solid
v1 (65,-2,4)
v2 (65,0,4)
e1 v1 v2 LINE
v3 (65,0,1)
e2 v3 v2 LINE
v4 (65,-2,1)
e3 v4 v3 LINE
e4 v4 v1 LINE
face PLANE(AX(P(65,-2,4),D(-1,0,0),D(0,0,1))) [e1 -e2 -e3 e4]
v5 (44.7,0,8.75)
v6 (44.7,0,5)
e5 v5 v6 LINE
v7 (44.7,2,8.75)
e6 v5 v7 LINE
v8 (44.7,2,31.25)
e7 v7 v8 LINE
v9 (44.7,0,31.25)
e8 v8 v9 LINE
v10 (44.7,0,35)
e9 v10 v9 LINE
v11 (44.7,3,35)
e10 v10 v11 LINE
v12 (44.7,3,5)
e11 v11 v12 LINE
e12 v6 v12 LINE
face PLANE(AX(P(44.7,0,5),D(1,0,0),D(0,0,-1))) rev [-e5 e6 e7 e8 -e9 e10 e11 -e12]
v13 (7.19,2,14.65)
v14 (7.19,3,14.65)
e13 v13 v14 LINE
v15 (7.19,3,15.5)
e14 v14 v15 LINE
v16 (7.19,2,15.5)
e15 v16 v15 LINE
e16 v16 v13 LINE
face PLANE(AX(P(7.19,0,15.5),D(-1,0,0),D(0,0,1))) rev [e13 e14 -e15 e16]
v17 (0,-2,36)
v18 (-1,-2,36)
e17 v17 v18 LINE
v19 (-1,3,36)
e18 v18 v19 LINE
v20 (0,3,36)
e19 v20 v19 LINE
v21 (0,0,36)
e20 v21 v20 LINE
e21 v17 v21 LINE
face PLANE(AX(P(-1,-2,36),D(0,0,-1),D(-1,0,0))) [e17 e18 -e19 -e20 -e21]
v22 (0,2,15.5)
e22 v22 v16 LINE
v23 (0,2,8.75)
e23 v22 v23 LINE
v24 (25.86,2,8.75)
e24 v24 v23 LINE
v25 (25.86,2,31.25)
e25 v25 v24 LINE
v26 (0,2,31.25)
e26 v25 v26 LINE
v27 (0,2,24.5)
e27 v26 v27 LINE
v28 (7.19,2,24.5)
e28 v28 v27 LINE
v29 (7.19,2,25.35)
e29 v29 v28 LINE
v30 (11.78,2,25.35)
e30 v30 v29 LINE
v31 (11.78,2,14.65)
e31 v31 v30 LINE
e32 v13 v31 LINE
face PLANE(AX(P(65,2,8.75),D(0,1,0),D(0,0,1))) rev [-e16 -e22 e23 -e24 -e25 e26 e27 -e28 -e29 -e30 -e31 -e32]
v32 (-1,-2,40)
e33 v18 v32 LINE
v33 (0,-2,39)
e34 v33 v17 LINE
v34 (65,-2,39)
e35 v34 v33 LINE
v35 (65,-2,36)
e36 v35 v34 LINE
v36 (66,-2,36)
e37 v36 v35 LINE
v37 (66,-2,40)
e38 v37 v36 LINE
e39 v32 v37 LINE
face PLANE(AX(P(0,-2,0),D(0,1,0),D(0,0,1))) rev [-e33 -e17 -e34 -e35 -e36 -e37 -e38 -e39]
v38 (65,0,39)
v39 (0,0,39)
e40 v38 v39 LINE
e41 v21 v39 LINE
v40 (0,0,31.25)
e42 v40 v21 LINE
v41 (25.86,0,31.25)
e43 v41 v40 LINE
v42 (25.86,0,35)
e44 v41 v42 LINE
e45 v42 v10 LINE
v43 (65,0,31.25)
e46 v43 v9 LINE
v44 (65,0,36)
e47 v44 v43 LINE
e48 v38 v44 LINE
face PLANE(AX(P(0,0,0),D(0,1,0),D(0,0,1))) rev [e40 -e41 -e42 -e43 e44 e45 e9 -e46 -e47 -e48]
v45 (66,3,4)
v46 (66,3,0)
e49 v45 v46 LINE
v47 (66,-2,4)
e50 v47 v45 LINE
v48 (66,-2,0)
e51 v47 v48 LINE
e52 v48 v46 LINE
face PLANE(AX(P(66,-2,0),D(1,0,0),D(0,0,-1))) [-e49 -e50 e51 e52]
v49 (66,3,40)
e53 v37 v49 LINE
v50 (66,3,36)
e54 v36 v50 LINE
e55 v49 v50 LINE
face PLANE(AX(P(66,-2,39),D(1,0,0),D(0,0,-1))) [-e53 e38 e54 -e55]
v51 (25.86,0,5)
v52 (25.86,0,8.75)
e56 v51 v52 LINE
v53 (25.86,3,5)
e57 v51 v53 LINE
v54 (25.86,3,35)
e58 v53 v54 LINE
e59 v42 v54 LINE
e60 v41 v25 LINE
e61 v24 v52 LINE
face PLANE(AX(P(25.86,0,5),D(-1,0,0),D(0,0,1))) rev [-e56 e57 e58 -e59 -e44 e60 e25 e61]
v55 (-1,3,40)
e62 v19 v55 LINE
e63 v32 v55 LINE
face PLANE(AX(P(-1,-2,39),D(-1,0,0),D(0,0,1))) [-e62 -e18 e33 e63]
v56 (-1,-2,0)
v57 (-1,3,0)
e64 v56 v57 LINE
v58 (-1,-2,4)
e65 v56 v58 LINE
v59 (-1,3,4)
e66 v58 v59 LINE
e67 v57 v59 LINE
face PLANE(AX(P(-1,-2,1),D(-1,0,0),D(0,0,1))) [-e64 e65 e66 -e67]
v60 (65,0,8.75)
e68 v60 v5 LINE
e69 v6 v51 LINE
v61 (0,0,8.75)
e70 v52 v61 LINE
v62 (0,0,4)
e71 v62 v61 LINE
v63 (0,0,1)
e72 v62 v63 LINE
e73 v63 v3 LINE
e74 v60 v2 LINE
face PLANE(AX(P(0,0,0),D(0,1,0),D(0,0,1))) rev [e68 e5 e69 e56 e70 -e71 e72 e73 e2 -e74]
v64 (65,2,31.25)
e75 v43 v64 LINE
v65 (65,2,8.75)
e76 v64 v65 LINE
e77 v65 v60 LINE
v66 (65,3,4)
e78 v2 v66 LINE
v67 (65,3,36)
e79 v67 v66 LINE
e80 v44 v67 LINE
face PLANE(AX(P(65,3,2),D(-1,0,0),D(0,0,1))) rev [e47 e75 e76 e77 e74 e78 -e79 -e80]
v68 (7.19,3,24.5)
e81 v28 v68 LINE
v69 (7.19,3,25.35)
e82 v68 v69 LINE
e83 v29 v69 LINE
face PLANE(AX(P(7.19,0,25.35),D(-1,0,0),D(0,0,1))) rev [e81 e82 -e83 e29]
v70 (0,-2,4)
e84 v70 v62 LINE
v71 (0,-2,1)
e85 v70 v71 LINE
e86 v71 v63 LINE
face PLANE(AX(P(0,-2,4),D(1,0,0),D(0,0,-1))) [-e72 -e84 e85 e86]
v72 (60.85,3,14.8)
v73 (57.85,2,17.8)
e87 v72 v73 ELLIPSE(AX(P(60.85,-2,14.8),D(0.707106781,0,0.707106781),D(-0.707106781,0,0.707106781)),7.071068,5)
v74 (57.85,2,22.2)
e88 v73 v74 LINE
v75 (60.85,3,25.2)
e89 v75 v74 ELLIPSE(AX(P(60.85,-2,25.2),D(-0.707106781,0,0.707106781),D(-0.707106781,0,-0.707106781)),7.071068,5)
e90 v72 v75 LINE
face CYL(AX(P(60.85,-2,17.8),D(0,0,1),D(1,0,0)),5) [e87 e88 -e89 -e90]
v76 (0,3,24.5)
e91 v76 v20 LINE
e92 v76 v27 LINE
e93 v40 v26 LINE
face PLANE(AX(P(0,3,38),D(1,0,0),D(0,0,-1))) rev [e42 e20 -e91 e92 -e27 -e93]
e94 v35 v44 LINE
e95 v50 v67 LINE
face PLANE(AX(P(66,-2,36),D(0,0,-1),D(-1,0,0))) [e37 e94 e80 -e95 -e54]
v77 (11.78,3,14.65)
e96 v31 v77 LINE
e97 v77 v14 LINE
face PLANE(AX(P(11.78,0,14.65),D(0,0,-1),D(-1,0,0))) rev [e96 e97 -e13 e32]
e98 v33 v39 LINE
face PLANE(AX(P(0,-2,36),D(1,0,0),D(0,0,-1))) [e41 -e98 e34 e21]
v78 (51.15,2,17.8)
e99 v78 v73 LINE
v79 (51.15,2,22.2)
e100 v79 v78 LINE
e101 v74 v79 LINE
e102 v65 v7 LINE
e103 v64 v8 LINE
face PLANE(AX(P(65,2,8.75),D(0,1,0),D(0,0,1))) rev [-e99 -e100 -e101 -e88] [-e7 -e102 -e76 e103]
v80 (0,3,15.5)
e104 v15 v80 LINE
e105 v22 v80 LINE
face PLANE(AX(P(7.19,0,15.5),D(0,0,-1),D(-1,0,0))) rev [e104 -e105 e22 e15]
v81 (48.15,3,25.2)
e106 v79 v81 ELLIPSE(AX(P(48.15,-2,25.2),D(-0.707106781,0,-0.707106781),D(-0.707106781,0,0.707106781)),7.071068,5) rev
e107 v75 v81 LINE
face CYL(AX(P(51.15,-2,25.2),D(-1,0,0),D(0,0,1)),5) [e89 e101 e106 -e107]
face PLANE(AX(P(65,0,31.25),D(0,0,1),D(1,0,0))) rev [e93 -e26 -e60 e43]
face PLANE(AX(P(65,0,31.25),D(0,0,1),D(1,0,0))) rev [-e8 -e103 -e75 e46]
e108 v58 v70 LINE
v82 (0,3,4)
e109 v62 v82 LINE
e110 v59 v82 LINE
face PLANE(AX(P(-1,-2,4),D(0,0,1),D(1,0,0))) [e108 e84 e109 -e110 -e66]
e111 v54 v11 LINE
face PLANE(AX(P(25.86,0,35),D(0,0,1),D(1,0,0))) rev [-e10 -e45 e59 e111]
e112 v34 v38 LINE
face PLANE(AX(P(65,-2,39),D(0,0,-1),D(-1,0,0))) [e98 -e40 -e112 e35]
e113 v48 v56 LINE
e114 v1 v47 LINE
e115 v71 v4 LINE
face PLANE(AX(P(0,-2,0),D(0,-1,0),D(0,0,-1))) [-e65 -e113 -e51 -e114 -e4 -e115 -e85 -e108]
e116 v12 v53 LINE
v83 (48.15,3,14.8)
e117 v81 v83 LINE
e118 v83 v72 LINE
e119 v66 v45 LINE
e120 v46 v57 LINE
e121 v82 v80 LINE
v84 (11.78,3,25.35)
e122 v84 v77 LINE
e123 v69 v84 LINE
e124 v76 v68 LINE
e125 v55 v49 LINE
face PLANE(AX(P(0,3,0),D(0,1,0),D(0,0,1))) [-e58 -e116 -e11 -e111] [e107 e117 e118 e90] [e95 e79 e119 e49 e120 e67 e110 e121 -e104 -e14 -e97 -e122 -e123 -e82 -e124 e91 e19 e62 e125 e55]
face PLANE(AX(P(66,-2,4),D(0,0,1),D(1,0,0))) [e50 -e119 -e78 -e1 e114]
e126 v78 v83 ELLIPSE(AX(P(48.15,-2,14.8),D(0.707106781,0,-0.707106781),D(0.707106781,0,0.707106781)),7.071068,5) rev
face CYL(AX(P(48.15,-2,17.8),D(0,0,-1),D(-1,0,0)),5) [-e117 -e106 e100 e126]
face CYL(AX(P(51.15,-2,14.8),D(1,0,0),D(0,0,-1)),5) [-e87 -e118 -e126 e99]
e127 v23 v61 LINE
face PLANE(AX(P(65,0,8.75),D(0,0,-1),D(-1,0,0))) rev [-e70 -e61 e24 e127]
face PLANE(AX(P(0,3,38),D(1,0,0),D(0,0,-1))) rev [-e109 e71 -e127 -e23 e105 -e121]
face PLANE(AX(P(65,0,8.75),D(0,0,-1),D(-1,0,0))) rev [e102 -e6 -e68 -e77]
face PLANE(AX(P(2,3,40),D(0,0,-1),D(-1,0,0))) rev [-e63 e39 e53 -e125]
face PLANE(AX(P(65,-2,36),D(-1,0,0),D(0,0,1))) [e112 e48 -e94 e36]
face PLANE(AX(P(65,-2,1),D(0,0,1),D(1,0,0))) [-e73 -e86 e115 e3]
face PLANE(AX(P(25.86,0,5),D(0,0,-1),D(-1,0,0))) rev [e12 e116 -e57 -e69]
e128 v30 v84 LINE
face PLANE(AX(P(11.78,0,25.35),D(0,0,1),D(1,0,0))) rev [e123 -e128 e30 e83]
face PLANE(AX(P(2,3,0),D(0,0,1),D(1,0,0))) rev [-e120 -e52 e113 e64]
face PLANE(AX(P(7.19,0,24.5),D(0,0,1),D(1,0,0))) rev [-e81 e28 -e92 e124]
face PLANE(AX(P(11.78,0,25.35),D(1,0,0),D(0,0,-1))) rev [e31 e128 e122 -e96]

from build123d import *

# Parameters (mm, degrees)
BOSS_EXTRUDE1_DEPTH     = 3
SKETCH2_W               = 6.7
SKETCH2_H               = 4.4
SKETCH2_W_2             = 18.84
SKETCH2_H_2             = 30
CUT_EXTRUDE1_DEPTH      = 77.380625816
CUT_EXTRUDE2_DEPTH      = 61.059054272
CUT_EXTRUDE2_DEPTH_BACK = 61.059054272
SKETCH5_W               = 22.5
SKETCH5_H               = 2
FILLET3_R               = 5
BOSS_EXTRUDE2_DEPTH     = 5


with BuildPart() as part:
    # Sketch1 → Boss-Extrude1 (new body)
    with BuildSketch(Plane(origin=(0, 0, 0), x_dir=(1, 0, 0), z_dir=(0, 1, 0))):
        Polygon((65, -38), (65, -40), (63, -40), (2, -40), (0, -40), (0, -38), (0, -2), (0, 0), (2, 0), (63, 0), (65, 0), (65, -2), align=None)
    extrude(amount=BOSS_EXTRUDE1_DEPTH)

    # Sketch2 → Cut-Extrude1 (cut, through all)
    with BuildSketch(Plane(origin=(0, 3, 0), x_dir=(1, 0, 0), z_dir=(0, 1, 0))):
        with Locations((54.5, -20)):
            Rectangle(SKETCH2_W, SKETCH2_H)
        Polygon((11.78, -25.35), (7.19, -25.35), (7.19, -24.5), (-0.16, -24.5), (-0.16, -15.5), (7.19, -15.5), (7.19, -14.65), (11.78, -14.65), align=None)
        with Locations((35.28, -20)):
            Rectangle(SKETCH2_W_2, SKETCH2_H_2)
    extrude(amount=-CUT_EXTRUDE1_DEPTH, mode=Mode.SUBTRACT)

    # Sketch5 → Cut-Extrude2 (cut, two sides: drawn at the far end of the back side and taken through both)
    with BuildSketch(Plane.ZY.offset(-44.7).offset(-CUT_EXTRUDE2_DEPTH_BACK)):
        with Locations((20, 1)):
            Rectangle(SKETCH5_W, SKETCH5_H)
    extrude(amount=CUT_EXTRUDE2_DEPTH + CUT_EXTRUDE2_DEPTH_BACK, mode=Mode.SUBTRACT)

    # Fillet3
    # the kernel refuses this fillet: 5 mm, written as the material it takes off along each edge
    with BuildSketch(Plane(origin=(57.85, 3, 22.2), x_dir=(0, 0, 1), z_dir=(-1, 0, 0)), Plane(origin=(51.15, 3, 17.8), x_dir=(0, 0, -1), z_dir=(1, 0, 0))) as fillet3_piece_1:
        with BuildLine():
            CenterArc((3, -5), FILLET3_R, 90, 36.869897646)
            Line((0, -1), (-0.06, -0.92))
            ThreePointArc((-0.06, -0.92), (-0.1, -0.5), (-0.1, 0))
            Line((-0.1, 0), (0, 0.1))
            Line((0, 0.1), (3, 0.1))
            Line((3, 0.1), (3, 0))
        make_face()
    extrude(amount=6.7, mode=Mode.SUBTRACT)
    with BuildSketch(Plane(origin=(57.85, 3, 17.8), x_dir=(1, 0, 0), z_dir=(0, 0, 1)), Plane(origin=(51.15, 3, 22.2), x_dir=(-1, 0, 0), z_dir=(0, 0, -1))) as fillet3_piece_2:
        with BuildLine():
            CenterArc((3, -5), FILLET3_R, 90, 36.869897646)
            Line((0, -1), (-0.06, -0.92))
            ThreePointArc((-0.06, -0.92), (-0.1, -0.5), (-0.1, 0))
            Line((-0.1, 0), (0, 0.1))
            Line((0, 0.1), (3, 0.1))
            Line((3, 0.1), (3, 0))
        make_face()
    extrude(amount=4.4, mode=Mode.SUBTRACT)
    with BuildSketch(Plane(origin=(57.85, 3, 17.8), x_dir=(1, 0, 0), z_dir=(0, 0, 1))) as fillet3_piece_3a_section:
        with BuildLine():
            CenterArc((3, -5), FILLET3_R, 90, 36.869897646)
            Line((0, -1), (-0.06, -0.92))
            ThreePointArc((-0.06, -0.92), (-0.1, -0.5), (-0.1, 0))
            Line((-0.1, 0), (0, 0.1))
            Line((0, 0.1), (3, 0.1))
            Line((3, 0.1), (3, 0))
        make_face()
    fillet3_piece_3a = extrude(amount=11.9, mode=Mode.PRIVATE)
    fillet3_piece_3a = split(fillet3_piece_3a, bisect_by=Plane(origin=(58.699672813, 2.773811602, 22.2), z_dir=(0, 0, 1)), keep=Keep.TOP, mode=Mode.PRIVATE)
    with BuildSketch(Plane(origin=(65.35, 3, 22.2), x_dir=(0, 0, 1), z_dir=(-1, 0, 0))) as fillet3_piece_3b_section:
        with BuildLine():
            CenterArc((3, -5), FILLET3_R, 90, 36.869897646)
            Line((0, -1), (-0.06, -0.92))
            ThreePointArc((-0.06, -0.92), (-0.1, -0.5), (-0.1, 0))
            Line((-0.1, 0), (0, 0.1))
            Line((0, 0.1), (3, 0.1))
            Line((3, 0.1), (3, 0))
        make_face()
    fillet3_piece_3b = extrude(amount=14.2, mode=Mode.PRIVATE)
    fillet3_piece_3b = split(fillet3_piece_3b, bisect_by=Plane(origin=(57.85, 2.773811602, 23.049672813), z_dir=(1, 0, 0)), keep=Keep.TOP, mode=Mode.PRIVATE)
    fillet3_piece_3 = fillet3_piece_3a & fillet3_piece_3b
    add(fillet3_piece_3, mode=Mode.SUBTRACT)
    with BuildSketch(Plane(origin=(57.85, 3, 22.2), x_dir=(0, 0, 1), z_dir=(-1, 0, 0))) as fillet3_piece_4a_section:
        with BuildLine():
            CenterArc((3, -5), FILLET3_R, 90, 36.869897646)
            Line((0, -1), (-0.06, -0.92))
            ThreePointArc((-0.06, -0.92), (-0.1, -0.5), (-0.1, 0))
            Line((-0.1, 0), (0, 0.1))
            Line((0, 0.1), (3, 0.1))
            Line((3, 0.1), (3, 0))
        make_face()
    fillet3_piece_4a = extrude(amount=14.2, mode=Mode.PRIVATE)
    fillet3_piece_4a = split(fillet3_piece_4a, bisect_by=Plane(origin=(51.15, 2.773811602, 23.049672813), z_dir=(-1, 0, 0)), keep=Keep.TOP, mode=Mode.PRIVATE)
    with BuildSketch(Plane(origin=(51.15, 3, 29.7), x_dir=(-1, 0, 0), z_dir=(0, 0, -1))) as fillet3_piece_4b_section:
        with BuildLine():
            CenterArc((3, -5), FILLET3_R, 90, 36.869897646)
            Line((0, -1), (-0.06, -0.92))
            ThreePointArc((-0.06, -0.92), (-0.1, -0.5), (-0.1, 0))
            Line((-0.1, 0), (0, 0.1))
            Line((0, 0.1), (3, 0.1))
            Line((3, 0.1), (3, 0))
        make_face()
    fillet3_piece_4b = extrude(amount=11.9, mode=Mode.PRIVATE)
    fillet3_piece_4b = split(fillet3_piece_4b, bisect_by=Plane(origin=(50.300327187, 2.773811602, 22.2), z_dir=(0, 0, 1)), keep=Keep.TOP, mode=Mode.PRIVATE)
    fillet3_piece_4 = fillet3_piece_4a & fillet3_piece_4b
    add(fillet3_piece_4, mode=Mode.SUBTRACT)
    with BuildSketch(Plane(origin=(51.15, 3, 17.8), x_dir=(0, 0, -1), z_dir=(1, 0, 0))) as fillet3_piece_5a_section:
        with BuildLine():
            CenterArc((3, -5), FILLET3_R, 90, 36.869897646)
            Line((0, -1), (-0.06, -0.92))
            ThreePointArc((-0.06, -0.92), (-0.1, -0.5), (-0.1, 0))
            Line((-0.1, 0), (0, 0.1))
            Line((0, 0.1), (3, 0.1))
            Line((3, 0.1), (3, 0))
        make_face()
    fillet3_piece_5a = extrude(amount=14.2, mode=Mode.PRIVATE)
    fillet3_piece_5a = split(fillet3_piece_5a, bisect_by=Plane(origin=(57.85, 2.773811602, 16.950327187), z_dir=(1, 0, 0)), keep=Keep.TOP, mode=Mode.PRIVATE)
    with BuildSketch(Plane(origin=(57.85, 3, 10.3), x_dir=(1, 0, 0), z_dir=(0, 0, 1))) as fillet3_piece_5b_section:
        with BuildLine():
            CenterArc((3, -5), FILLET3_R, 90, 36.869897646)
            Line((0, -1), (-0.06, -0.92))
            ThreePointArc((-0.06, -0.92), (-0.1, -0.5), (-0.1, 0))
            Line((-0.1, 0), (0, 0.1))
            Line((0, 0.1), (3, 0.1))
            Line((3, 0.1), (3, 0))
        make_face()
    fillet3_piece_5b = extrude(amount=11.9, mode=Mode.PRIVATE)
    fillet3_piece_5b = split(fillet3_piece_5b, bisect_by=Plane(origin=(58.699672813, 2.773811602, 17.8), z_dir=(0, 0, -1)), keep=Keep.TOP, mode=Mode.PRIVATE)
    fillet3_piece_5 = fillet3_piece_5a & fillet3_piece_5b
    add(fillet3_piece_5, mode=Mode.SUBTRACT)
    with BuildSketch(Plane(origin=(43.65, 3, 17.8), x_dir=(0, 0, -1), z_dir=(1, 0, 0))) as fillet3_piece_6a_section:
        with BuildLine():
            CenterArc((3, -5), FILLET3_R, 90, 36.869897646)
            Line((0, -1), (-0.06, -0.92))
            ThreePointArc((-0.06, -0.92), (-0.1, -0.5), (-0.1, 0))
            Line((-0.1, 0), (0, 0.1))
            Line((0, 0.1), (3, 0.1))
            Line((3, 0.1), (3, 0))
        make_face()
    fillet3_piece_6a = extrude(amount=14.2, mode=Mode.PRIVATE)
    fillet3_piece_6a = split(fillet3_piece_6a, bisect_by=Plane(origin=(51.15, 2.773811602, 16.950327187), z_dir=(-1, 0, 0)), keep=Keep.TOP, mode=Mode.PRIVATE)
    with BuildSketch(Plane(origin=(51.15, 3, 22.2), x_dir=(-1, 0, 0), z_dir=(0, 0, -1))) as fillet3_piece_6b_section:
        with BuildLine():
            CenterArc((3, -5), FILLET3_R, 90, 36.869897646)
            Line((0, -1), (-0.06, -0.92))
            ThreePointArc((-0.06, -0.92), (-0.1, -0.5), (-0.1, 0))
            Line((-0.1, 0), (0, 0.1))
            Line((0, 0.1), (3, 0.1))
            Line((3, 0.1), (3, 0))
        make_face()
    fillet3_piece_6b = extrude(amount=11.9, mode=Mode.PRIVATE)
    fillet3_piece_6b = split(fillet3_piece_6b, bisect_by=Plane(origin=(50.300327187, 2.773811602, 17.8), z_dir=(0, 0, -1)), keep=Keep.TOP, mode=Mode.PRIVATE)
    fillet3_piece_6 = fillet3_piece_6a & fillet3_piece_6b
    add(fillet3_piece_6, mode=Mode.SUBTRACT)

    # Sketch8 → Boss-Extrude2 (add)
    with BuildSketch(Plane(origin=(0, 3, 0), x_dir=(1, 0, 0), z_dir=(0, 1, 0))):
        Polygon((-1, -40), (66, -40), (66, -39), (66, -36), (65, -36), (65, -39), (0, -39), (0, -36), (-1, -36), (-1, -39), align=None)
        Polygon((-1, 0), (66, 0), (66, -1), (66, -4), (65, -4), (65, -1), (0, -1), (0, -4), (-1, -4), (-1, -1), align=None)
    extrude(amount=-BOSS_EXTRUDE2_DEPTH)


solid = part.part
